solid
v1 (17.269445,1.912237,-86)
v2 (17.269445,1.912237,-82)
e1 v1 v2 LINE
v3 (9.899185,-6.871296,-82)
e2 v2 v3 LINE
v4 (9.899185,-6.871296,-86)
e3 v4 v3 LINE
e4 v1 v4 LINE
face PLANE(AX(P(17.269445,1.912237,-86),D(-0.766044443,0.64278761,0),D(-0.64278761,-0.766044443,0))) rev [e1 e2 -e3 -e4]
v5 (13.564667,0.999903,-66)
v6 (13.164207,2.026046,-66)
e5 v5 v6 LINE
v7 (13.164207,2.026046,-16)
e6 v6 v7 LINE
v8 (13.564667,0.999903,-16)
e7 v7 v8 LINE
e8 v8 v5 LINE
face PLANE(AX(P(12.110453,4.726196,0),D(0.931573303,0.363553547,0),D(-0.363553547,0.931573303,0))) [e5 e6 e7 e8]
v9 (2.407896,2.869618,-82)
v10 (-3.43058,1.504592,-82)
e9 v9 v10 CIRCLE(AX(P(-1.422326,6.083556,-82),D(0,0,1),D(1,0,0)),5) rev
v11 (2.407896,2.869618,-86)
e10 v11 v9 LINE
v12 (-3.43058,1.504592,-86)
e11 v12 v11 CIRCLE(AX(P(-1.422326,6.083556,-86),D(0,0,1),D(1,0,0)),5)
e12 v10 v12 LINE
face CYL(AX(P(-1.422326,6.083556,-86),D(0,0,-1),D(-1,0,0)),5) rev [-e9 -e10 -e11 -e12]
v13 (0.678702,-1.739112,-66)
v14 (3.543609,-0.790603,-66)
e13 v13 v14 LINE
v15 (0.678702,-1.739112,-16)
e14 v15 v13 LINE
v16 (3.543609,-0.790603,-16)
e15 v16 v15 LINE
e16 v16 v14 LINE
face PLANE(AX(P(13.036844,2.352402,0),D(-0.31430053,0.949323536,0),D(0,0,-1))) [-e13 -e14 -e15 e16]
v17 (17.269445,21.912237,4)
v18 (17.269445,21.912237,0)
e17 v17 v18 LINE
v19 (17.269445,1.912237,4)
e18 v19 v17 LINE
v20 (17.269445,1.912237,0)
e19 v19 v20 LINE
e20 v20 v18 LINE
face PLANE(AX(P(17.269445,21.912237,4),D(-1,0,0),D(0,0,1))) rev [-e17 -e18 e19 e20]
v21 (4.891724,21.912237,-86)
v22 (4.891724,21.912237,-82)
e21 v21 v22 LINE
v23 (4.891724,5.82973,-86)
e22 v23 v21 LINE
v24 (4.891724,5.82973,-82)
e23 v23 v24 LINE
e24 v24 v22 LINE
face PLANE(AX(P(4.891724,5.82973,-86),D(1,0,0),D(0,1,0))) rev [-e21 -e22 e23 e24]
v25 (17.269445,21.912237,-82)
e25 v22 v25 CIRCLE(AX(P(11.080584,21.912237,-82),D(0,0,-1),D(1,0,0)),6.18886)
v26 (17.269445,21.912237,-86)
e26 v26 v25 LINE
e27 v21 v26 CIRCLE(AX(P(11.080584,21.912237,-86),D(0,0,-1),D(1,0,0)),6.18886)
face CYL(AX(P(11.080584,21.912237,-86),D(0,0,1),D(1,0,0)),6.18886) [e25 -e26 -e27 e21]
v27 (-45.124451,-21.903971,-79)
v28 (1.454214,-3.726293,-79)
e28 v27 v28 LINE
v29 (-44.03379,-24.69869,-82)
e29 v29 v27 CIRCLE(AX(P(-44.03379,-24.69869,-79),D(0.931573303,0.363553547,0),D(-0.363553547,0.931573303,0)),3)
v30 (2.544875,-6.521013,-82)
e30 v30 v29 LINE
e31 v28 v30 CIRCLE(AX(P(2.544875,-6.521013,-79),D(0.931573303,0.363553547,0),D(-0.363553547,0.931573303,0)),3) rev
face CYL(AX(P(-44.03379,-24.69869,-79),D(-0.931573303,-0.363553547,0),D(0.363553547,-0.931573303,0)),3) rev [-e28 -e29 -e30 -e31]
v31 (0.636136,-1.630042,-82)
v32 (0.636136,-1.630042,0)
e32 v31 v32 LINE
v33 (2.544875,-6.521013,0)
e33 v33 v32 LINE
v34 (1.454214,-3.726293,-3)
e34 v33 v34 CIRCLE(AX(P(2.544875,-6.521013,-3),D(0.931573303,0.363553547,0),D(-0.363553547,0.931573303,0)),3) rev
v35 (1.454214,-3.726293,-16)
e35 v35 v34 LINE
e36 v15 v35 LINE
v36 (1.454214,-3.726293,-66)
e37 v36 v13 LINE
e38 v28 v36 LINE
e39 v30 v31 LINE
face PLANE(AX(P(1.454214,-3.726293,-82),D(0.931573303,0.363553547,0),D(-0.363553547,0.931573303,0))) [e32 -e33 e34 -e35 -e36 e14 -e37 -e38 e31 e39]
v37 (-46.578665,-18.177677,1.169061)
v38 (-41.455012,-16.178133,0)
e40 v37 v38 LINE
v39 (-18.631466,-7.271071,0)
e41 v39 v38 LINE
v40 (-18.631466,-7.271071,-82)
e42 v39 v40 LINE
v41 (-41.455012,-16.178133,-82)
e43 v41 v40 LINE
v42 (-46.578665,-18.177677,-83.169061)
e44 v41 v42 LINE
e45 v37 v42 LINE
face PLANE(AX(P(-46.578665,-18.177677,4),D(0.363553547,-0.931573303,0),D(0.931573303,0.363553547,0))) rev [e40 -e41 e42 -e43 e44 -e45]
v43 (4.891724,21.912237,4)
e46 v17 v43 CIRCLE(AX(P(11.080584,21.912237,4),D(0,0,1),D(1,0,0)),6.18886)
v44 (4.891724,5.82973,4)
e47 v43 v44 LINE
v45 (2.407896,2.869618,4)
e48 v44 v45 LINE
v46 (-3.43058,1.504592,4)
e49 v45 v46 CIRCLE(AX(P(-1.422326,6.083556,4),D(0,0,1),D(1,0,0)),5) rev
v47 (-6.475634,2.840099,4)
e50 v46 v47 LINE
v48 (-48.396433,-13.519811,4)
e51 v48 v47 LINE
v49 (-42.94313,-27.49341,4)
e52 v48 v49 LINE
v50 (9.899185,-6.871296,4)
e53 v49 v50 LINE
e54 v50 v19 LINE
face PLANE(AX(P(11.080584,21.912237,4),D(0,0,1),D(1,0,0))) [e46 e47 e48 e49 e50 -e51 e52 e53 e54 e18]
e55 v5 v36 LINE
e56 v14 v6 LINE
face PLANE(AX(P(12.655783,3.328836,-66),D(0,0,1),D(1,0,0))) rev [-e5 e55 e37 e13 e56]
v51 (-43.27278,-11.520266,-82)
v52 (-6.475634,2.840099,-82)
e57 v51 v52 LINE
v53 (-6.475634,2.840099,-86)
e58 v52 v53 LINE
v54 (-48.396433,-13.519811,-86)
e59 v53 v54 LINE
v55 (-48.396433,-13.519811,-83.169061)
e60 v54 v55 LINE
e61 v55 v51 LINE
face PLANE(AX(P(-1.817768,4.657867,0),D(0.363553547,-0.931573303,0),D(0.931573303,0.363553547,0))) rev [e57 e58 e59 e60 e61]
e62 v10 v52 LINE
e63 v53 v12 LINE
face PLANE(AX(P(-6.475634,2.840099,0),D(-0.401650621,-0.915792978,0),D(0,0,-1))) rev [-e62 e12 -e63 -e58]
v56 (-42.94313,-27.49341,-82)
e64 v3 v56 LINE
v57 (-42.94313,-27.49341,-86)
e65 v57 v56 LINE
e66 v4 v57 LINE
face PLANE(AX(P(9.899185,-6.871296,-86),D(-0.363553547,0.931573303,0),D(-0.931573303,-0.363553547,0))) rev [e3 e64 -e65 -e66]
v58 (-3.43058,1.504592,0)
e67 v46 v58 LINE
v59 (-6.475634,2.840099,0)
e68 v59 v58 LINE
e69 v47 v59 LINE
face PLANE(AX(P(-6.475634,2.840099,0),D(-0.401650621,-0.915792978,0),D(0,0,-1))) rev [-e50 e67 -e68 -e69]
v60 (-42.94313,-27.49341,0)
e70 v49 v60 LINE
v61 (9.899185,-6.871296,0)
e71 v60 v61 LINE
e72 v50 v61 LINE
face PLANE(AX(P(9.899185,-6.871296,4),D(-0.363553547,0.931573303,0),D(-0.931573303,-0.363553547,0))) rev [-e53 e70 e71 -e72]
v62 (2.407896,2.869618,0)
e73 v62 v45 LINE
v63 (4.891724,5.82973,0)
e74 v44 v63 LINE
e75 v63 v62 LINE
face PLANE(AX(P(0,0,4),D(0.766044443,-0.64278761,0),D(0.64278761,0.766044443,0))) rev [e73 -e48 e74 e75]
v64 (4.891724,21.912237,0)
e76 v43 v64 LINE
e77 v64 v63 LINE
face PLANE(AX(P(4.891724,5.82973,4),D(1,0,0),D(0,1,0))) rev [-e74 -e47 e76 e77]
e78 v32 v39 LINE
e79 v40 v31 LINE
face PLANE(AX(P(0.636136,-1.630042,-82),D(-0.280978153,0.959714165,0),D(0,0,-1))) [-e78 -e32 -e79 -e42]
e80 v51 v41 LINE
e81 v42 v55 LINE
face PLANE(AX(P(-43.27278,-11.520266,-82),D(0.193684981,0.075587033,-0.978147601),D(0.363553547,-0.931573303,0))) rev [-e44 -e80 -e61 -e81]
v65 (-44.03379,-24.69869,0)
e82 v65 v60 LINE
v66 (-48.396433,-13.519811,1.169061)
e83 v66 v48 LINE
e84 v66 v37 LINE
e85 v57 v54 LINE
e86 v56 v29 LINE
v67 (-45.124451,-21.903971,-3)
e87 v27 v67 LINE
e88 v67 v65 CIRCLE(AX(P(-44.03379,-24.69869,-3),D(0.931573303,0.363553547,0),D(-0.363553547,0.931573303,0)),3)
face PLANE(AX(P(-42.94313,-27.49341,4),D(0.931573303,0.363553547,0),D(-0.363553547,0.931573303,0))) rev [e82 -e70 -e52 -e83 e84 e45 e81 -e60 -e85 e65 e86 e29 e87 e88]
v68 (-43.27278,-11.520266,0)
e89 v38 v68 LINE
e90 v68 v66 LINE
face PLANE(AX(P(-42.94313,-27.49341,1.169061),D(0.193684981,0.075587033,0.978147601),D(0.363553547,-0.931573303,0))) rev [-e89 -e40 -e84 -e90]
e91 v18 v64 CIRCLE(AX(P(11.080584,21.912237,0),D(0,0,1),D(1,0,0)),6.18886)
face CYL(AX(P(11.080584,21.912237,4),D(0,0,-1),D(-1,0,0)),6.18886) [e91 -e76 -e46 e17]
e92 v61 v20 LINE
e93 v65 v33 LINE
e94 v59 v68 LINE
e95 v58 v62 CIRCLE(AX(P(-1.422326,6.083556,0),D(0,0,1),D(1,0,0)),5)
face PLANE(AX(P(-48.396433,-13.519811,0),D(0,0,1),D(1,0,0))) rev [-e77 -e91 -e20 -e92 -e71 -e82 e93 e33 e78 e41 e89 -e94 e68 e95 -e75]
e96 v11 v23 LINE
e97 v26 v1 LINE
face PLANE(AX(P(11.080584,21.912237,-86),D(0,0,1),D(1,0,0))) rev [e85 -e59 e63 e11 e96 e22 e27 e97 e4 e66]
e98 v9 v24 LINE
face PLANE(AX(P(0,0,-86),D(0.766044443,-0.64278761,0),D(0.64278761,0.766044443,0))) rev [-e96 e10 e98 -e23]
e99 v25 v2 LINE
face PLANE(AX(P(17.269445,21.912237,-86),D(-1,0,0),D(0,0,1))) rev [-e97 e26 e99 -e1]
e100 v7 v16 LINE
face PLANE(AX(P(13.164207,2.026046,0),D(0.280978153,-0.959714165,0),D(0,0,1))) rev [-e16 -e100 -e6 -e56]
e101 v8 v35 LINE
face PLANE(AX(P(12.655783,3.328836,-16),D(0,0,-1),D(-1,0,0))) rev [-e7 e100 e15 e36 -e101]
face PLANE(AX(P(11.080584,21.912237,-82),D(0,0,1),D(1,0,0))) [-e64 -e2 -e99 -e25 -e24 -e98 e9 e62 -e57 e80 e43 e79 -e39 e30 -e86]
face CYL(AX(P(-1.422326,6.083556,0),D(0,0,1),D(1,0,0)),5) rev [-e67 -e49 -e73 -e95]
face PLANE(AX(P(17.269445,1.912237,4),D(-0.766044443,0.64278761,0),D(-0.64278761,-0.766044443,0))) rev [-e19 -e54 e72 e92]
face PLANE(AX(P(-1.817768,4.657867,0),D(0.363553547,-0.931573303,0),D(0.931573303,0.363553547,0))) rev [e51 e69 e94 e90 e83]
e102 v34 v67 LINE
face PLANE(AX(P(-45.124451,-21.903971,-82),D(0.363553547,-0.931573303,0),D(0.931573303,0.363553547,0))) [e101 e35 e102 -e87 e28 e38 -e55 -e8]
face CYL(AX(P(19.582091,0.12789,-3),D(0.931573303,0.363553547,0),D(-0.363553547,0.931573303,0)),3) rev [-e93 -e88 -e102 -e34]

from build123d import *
from OCP.BRepFilletAPI import BRepFilletAPI_MakeChamfer

# Parameters (mm, degrees)
ESTRUSIONE_ESTRUSIONE1_DEPTH = 4
ESTRUSIONE_ESTRUSIONE2_DEPTH = 82
ESTRUSIONE_ESTRUSIONE3_START = 4
ESTRUSIONE_ESTRUSIONE3_DEPTH = 4
SCHIZZO6_W                   = 50
SCHIZZO6_H                   = 4
ESTRUSIONE_ESTRUSIONE4_DEPTH = 5
SMUSSO1_SIZE                 = 5.5
SMUSSO1_SIZE2                = 1.169061089
RACCORDO1_R                  = 3
SMUSSO2_SIZE                 = 5
RACCORDO2_START              = -86
RACCORDO2_DEPTH              = 4
RACCORDO2_2_DEPTH            = 4
SCHIZZO7_W                   = 50
SCHIZZO7_H                   = 2.5
ESTRUSIONE_ESTRUSIONE5_DEPTH = 13
SMUSSO3_SIZE                 = 20
SMUSSO3_SIZE_2               = 1.048155586
SMUSSO4_SIZE                 = 20
SMUSSO4_SIZE2                = 1.749773271
SMUSSO5_SIZE                 = 10
SMUSSO5_SIZE2                = 0.350328071


with BuildPart() as part:
    # Schizzo1 → Estrusione-Estrusione1 (new body)
    with BuildSketch(Plane.XY):
        with BuildLine():
            Line((4.891723927, 5.829729564), (4.891723927, 21.912236928))
            ThreePointArc((4.891723927, 21.912236928), (11.08058435, 28.101097351), (17.269444773, 21.912236928))
            Line((17.269444773, 21.912236928), (17.269444773, 1.912236928))
            Line((17.269444773, 1.912236928), (9.899185428, -6.871296125))
            Line((9.899185428, -6.871296125), (-42.94312967, -27.493410377))
            Line((-42.94312967, -27.493410377), (-46.57866514, -18.177677349))
            Line((-46.57866514, -18.177677349), (0, 0))
            Line((0, 0), (4.891723927, 5.829729564))
        make_face()
    extrude(amount=ESTRUSIONE_ESTRUSIONE1_DEPTH)

    # Schizzo4 → Estrusione-Estrusione2 (add)
    with BuildSketch(Plane.XY):
        Polygon((-45.124450952, -21.90397056), (1.454214188, -3.726293211), (0, 0), (-46.57866514, -18.177677349), align=None)
    extrude(amount=-ESTRUSIONE_ESTRUSIONE2_DEPTH)

    # Schizzo5 → Estrusione-Estrusione3 (add)
    with BuildSketch(Plane(origin=(0, 0, -82), x_dir=(-1, 0, 0), z_dir=(0, 0, -1)).offset(ESTRUSIONE_ESTRUSIONE3_START)):
        with BuildLine():
            Line((42.94312967, -27.493410377), (46.57866514, -18.177677349))
            Line((46.57866514, -18.177677349), (0, 0))
            Line((0, 0), (-4.891723927, 5.829729564))
            Line((-4.891723927, 5.829729564), (-4.891723927, 21.912236928))
            ThreePointArc((-4.891723927, 21.912236928), (-11.08058435, 28.101097351), (-17.269444773, 21.912236928))
            Line((-17.269444773, 21.912236928), (-17.269444773, 1.912236928))
            Line((-17.269444773, 1.912236928), (-9.899185428, -6.871296125))
            Line((-9.899185428, -6.871296125), (42.94312967, -27.493410377))
        make_face()
    extrude(amount=-ESTRUSIONE_ESTRUSIONE3_DEPTH)

    # Schizzo6 → Estrusione-Estrusione4 (add)
    with BuildSketch(Plane(origin=(0, 0, 0), x_dir=(0.9315733027957475, 0.36355354697516373, 0), z_dir=(-0.36355354697516373, 0.9315733027957475, 0))):
        with Locations((-25, 84)):
            Rectangle(SCHIZZO6_W, SCHIZZO6_H)
        with Locations((-25, -2)):
            Rectangle(SCHIZZO6_W, SCHIZZO6_H)
    extrude(amount=ESTRUSIONE_ESTRUSIONE4_DEPTH)

    # Smusso1: one chamfer whose edges measure the first distance from different faces: ONE call of the kernel's chamfer builder (chamfer() names one face for all edges)
    smusso1_edges_1 = [part.edges().sort_by_distance(p)[0] for p in [
        (-47.487549007, -15.848744092, -82),
    ]]
    smusso1_side_1 = [part.faces().sort_by_distance(p)[0] for p in [
        (-24.198216437, -6.759905417, -82),
    ]]
    smusso1_edges_2 = [part.edges().sort_by_distance(p)[0] for p in [
        (-47.487549007, -15.848744092, 0),
    ]]
    smusso1_side_2 = [part.faces().sort_by_distance(p)[0] for p in [
        (-24.198216437, -6.759905417, 0),
    ]]
    smusso1 = BRepFilletAPI_MakeChamfer(part.part.solid().wrapped)
    for e in smusso1_edges_1:
        smusso1.Add(SMUSSO1_SIZE, SMUSSO1_SIZE2, e.wrapped, smusso1_side_1[0].wrapped)  # the first distance lies on this face
    for e in smusso1_edges_2:
        smusso1.Add(SMUSSO1_SIZE, SMUSSO1_SIZE2, e.wrapped, smusso1_side_2[0].wrapped)  # the first distance lies on this face
    add(Compound.cast(smusso1.Shape()), mode=Mode.REPLACE)

    # Raccordo1
    raccordo1_edges = [part.edges().sort_by_distance(p)[0] for p in [
        (-21.835118382, -12.815131886, -82),
        (-21.835118382, -12.815131886, 0),
    ]]
    fillet(raccordo1_edges, radius=RACCORDO1_R)

    # Smusso2
    smusso2_edges = [part.edges().sort_by_distance(p)[0] for p in [
        (-1.817767735, 4.657866514, 2),
        (-1.817767735, 4.657866514, -84),
    ]]
    chamfer(smusso2_edges, length=SMUSSO2_SIZE - 0.0001)  # a hair under: the kernel refuses the full size

    # Raccordo2: read off the stored shape, not the designer's step
    # Raccordo2 outline → Raccordo2 (add)
    with BuildSketch(Plane.XY.offset(RACCORDO2_START)):
        with BuildLine():
            Line((0, 0), (2.407895765, 2.869618428))
            ThreePointArc((2.407895765, 2.869618428), (-0.284030607, 1.214852073), (-3.430579557, 1.504591587))
            Line((-3.430579557, 1.504591587), (0, 0))
        make_face()
    extrude(amount=RACCORDO2_DEPTH)

    # Raccordo2 2 outline → Raccordo2 2 (add)
    with BuildSketch(Plane.XY):
        with BuildLine():
            Line((0, 0), (2.407895765, 2.869618428))
            ThreePointArc((2.407895765, 2.869618428), (-0.284030607, 1.214852073), (-3.430579557, 1.504591587))
            Line((-3.430579557, 1.504591587), (0, 0))
        make_face()
    extrude(amount=RACCORDO2_2_DEPTH)

    # Schizzo7 → Estrusione-Estrusione5 (add)
    with BuildSketch(Plane(origin=(0, 0, 0), x_dir=(0, 0, -1), z_dir=(0.9315733027957472, 0.3635535469751644, 0))):
        with Locations((41, -2.75)):
            Rectangle(SCHIZZO7_W, SCHIZZO7_H)
    extrude(amount=ESTRUSIONE_ESTRUSIONE5_DEPTH)

    # Smusso3
    # the kernel refuses this chamfer: 20, 1.048155586 mm, written as the material it takes off along each edge
    with BuildSketch(Plane(origin=(12.655783257, 3.328836156, -16), x_dir=(-0.9315733027957472, -0.3635535469751644, 0), z_dir=(0, 0, -1))) as smusso3_piece_1_section:
        Polygon((SMUSSO3_SIZE, 0), (0, -SMUSSO3_SIZE_2), (0, 0), align=None)
    smusso3_piece_1 = extrude(amount=50, mode=Mode.PRIVATE)
    smusso3_piece_1 = split(smusso3_piece_1, bisect_by=Plane(origin=(0.54533032, -1.397359954, -16), z_dir=(0.9315733027957472, 0.36355354697516445, 0)), keep=Keep.TOP, mode=Mode.PRIVATE)
    add(smusso3_piece_1, mode=Mode.SUBTRACT)

    # Smusso4
    smusso4_edges = [part.edges().sort_by_distance(p)[0] for p in [
        (0, 0, -41),
    ]]
    smusso4_side = [part.faces().sort_by_distance(p)[0] for p in [
        (-23.323124739, -9.102026325, -41),
    ]]
    chamfer(smusso4_edges, length=SMUSSO4_SIZE, length2=SMUSSO4_SIZE2, reference=smusso4_side[0])

    # Smusso5
    smusso5_edges = [part.edges().sort_by_distance(p)[0] for p in [
        (13.036843938, 2.352402395, -41),
    ]]
    smusso5_side = [part.faces().sort_by_distance(p)[0] for p in [
        (6.857772748, 0.306645312, -41),
    ]]
    chamfer(smusso5_edges, length=SMUSSO5_SIZE, length2=SMUSSO5_SIZE2, reference=smusso5_side[0])


solid = part.part
